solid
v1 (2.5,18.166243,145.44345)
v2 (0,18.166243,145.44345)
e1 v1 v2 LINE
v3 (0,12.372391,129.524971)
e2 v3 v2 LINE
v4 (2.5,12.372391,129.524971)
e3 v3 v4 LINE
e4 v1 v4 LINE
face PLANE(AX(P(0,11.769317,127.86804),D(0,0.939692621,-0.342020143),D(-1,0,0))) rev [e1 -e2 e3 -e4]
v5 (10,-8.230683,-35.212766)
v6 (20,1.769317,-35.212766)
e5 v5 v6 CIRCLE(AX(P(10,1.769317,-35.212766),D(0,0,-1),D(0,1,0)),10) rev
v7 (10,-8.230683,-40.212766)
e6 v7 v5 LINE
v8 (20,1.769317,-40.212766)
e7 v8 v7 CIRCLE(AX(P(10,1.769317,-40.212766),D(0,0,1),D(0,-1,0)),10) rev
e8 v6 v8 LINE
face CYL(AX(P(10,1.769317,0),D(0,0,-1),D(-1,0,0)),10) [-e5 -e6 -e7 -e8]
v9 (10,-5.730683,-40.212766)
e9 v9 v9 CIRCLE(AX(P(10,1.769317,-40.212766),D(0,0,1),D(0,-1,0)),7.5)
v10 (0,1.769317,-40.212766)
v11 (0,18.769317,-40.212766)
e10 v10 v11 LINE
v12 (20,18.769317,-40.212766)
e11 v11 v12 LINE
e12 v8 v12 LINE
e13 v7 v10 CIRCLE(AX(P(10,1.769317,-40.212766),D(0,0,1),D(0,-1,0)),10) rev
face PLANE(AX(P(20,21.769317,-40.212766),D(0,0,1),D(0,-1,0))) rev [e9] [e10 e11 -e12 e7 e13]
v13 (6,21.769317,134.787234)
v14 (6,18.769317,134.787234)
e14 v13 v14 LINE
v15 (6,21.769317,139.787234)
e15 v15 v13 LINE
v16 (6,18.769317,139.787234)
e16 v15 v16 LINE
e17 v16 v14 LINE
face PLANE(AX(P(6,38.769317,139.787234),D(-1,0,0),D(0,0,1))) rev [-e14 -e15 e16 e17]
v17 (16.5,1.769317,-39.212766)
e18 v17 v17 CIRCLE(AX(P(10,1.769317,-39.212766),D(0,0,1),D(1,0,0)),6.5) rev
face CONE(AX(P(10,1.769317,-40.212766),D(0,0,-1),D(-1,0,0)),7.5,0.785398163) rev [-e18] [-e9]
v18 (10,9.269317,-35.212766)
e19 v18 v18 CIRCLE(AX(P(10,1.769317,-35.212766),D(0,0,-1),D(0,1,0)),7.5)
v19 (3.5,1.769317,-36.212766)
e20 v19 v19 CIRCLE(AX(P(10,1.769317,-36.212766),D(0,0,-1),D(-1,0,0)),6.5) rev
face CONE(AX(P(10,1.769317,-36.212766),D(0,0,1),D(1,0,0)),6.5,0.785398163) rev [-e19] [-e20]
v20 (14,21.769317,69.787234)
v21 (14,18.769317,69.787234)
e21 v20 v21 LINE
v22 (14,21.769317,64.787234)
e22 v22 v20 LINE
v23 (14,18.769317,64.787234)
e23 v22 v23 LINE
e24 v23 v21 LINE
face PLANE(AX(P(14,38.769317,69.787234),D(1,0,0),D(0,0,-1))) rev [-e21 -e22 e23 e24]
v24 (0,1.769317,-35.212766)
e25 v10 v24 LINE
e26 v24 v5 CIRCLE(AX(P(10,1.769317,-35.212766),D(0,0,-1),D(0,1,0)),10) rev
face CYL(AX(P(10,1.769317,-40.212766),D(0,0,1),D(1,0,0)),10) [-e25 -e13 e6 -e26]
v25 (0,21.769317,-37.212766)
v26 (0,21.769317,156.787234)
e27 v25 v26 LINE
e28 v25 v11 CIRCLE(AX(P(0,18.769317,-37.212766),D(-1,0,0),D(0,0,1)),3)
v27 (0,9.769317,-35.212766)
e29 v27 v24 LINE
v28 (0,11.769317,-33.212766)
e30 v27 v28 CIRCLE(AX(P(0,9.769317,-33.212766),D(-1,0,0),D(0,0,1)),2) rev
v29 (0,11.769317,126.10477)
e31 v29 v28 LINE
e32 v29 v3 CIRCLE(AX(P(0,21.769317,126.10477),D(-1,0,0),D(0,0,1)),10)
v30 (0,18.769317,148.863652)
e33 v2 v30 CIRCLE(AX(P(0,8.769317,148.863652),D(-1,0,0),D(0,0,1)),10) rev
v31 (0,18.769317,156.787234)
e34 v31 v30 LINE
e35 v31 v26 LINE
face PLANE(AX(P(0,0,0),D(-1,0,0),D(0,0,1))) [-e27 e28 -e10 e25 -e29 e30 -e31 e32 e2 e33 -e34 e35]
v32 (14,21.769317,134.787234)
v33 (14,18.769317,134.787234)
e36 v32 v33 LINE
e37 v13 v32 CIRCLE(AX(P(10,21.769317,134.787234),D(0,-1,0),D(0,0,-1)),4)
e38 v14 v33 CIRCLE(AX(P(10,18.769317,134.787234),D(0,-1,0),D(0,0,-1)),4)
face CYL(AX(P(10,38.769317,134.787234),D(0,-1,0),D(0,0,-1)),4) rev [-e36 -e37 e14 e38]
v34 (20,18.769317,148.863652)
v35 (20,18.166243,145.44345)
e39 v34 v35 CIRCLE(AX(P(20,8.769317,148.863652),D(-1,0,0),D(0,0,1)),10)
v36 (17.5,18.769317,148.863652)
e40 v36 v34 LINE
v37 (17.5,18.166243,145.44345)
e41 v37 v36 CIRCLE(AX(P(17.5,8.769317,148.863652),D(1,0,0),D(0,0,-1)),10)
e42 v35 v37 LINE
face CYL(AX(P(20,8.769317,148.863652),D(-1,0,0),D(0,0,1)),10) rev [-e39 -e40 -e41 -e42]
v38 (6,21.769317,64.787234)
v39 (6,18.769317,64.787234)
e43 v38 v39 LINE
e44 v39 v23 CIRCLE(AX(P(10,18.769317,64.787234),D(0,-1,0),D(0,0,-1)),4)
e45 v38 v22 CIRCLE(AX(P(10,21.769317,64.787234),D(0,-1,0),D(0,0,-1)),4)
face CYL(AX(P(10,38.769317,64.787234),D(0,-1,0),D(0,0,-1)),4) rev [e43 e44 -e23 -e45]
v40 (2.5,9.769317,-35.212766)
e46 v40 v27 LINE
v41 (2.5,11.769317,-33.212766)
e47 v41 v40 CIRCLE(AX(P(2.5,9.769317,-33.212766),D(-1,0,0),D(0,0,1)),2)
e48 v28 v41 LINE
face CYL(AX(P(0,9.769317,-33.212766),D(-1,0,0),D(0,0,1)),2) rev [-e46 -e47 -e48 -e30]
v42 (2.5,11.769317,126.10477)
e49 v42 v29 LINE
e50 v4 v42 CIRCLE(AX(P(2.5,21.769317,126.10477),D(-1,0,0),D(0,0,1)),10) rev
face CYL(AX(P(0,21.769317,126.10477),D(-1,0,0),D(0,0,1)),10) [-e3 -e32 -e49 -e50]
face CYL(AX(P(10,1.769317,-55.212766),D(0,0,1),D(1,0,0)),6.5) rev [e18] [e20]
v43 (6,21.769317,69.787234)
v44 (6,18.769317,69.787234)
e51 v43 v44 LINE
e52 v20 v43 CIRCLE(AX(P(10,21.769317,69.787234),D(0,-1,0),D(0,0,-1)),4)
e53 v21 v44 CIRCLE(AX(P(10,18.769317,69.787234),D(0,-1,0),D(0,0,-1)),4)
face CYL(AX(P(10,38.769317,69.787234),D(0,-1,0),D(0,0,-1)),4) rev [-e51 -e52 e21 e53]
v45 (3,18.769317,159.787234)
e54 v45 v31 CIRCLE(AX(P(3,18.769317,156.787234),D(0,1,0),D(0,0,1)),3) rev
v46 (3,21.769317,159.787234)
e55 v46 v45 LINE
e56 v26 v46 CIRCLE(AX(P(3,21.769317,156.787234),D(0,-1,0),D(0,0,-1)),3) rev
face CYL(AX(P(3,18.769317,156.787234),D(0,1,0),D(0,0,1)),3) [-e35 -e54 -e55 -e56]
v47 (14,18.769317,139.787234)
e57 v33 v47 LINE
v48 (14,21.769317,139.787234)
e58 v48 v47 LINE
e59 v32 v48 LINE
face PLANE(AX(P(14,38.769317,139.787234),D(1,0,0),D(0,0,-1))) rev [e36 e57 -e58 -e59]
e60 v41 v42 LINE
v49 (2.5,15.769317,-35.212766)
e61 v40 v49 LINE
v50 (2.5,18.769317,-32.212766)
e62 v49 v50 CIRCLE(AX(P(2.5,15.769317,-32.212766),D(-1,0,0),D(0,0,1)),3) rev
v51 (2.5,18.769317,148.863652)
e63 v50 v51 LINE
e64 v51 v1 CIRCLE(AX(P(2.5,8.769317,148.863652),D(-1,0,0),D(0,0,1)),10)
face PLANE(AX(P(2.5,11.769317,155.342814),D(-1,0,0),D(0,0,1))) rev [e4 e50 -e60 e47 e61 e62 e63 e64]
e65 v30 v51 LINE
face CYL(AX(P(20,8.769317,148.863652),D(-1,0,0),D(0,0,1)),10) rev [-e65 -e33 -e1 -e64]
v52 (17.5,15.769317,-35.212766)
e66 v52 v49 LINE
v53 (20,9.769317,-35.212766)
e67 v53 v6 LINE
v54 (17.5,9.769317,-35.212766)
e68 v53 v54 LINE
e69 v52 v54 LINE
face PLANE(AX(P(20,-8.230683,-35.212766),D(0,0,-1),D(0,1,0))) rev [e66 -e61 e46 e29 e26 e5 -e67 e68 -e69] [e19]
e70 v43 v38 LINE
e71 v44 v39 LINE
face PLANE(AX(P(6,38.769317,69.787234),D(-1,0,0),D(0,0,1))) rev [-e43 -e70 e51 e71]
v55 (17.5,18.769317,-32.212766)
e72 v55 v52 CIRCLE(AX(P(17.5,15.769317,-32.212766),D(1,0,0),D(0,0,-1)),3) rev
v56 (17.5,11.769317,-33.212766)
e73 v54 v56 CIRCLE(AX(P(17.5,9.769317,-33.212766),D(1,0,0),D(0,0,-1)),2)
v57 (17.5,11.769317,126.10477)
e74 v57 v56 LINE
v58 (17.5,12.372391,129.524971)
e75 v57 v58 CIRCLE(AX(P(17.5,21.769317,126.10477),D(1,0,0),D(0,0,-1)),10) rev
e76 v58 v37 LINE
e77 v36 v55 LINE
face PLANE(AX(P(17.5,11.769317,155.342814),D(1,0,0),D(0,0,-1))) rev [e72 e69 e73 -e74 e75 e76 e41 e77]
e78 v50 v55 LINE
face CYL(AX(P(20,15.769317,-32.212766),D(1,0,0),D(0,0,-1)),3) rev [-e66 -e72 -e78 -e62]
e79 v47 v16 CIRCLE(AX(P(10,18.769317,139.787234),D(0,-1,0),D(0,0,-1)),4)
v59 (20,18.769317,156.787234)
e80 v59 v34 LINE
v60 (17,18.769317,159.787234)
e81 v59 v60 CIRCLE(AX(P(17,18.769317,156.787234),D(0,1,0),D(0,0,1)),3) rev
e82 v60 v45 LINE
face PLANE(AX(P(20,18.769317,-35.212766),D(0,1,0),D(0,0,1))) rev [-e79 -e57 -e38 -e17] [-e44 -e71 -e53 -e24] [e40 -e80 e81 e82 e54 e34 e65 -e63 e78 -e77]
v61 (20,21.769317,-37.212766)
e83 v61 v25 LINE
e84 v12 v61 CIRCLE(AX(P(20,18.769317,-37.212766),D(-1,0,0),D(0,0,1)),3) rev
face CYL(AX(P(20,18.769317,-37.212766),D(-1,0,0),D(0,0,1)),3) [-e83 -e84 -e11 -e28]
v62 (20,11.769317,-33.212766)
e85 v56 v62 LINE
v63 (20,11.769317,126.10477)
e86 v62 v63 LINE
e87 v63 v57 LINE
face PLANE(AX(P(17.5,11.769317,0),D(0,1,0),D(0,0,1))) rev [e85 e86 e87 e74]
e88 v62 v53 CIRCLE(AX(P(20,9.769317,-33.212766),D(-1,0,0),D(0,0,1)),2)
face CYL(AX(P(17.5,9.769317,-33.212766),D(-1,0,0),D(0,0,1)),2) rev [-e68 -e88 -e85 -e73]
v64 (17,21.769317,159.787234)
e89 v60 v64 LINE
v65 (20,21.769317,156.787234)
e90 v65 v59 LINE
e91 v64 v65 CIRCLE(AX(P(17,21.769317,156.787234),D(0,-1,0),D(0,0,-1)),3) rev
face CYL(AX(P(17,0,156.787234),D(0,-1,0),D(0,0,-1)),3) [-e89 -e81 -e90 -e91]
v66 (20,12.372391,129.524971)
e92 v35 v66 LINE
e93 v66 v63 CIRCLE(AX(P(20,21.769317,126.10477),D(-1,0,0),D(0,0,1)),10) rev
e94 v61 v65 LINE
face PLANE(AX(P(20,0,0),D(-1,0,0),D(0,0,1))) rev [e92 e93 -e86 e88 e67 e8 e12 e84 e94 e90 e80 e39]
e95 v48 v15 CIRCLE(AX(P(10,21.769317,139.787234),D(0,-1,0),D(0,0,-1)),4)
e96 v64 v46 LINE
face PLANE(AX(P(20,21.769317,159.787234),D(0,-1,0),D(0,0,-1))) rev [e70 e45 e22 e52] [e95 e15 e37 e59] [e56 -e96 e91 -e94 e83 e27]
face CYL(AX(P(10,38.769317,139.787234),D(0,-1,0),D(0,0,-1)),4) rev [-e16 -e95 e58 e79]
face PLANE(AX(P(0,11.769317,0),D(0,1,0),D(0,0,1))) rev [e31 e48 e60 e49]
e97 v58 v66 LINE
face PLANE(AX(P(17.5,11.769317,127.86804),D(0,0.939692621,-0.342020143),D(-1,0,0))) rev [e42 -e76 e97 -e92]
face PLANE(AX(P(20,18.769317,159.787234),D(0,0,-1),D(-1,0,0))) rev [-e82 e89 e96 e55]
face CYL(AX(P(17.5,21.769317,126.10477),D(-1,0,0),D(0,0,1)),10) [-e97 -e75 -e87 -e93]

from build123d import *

# Parameters (mm, degrees)
BOSS_EXTRUDE1_DEPTH = 20
CUT_EXTRUDE1_DEPTH  = 20
LPATTERN1_COUNT     = 2
LPATTERN1_PITCH     = 70
SKETCH3_R           = 6.5
CUT_EXTRUDE2_DEPTH  = 20
FILLET1_R           = 3
FILLET2_R           = 10
CHAMFER1_SIZE       = 1
FILLET3_R           = 3
SKETCH4_W           = 2.5
SKETCH4_H           = 193.282741961
BOSS_EXTRUDE2_DEPTH = 7
LPATTERN2_COUNT     = 2
LPATTERN2_PITCH     = 17.5
CHAMFER2_SIZE       = 27.474774195
CHAMFER2_SIZE_2     = 10
FILLET4_R           = 10
FILLET5_R           = 2


# Some blends are built 0.0001 mm under size
with BuildPart() as part:
    # Sketch1 → Boss-Extrude1 (new body)
    with BuildSketch(Plane(origin=(0, 0, 0), x_dir=(0, 0, -1), z_dir=(1, 0, 0))):
        Polygon((-159.787234043, 21.769316909), (40.212765957, 21.769316909), (40.212765957, -8.230683091), (35.212765957, -8.230683091), (35.212765957, 18.769316909), (-159.787234043, 18.769316909), align=None)
    extrude(amount=BOSS_EXTRUDE1_DEPTH)

    # Sketch2 → Cut-Extrude1 (cut)
    with BuildSketch(Plane.XZ.offset(-18.769316909)):
        with BuildLine():
            Line((14, 139.787234043), (14, 134.787234043))
            ThreePointArc((14, 134.787234043), (10, 130.787234043), (6, 134.787234043))
            Line((6, 134.787234043), (6, 139.787234043))
            ThreePointArc((6, 139.787234043), (10, 143.787234043), (14, 139.787234043))
        make_face()
    cut_extrude1 = extrude(amount=-CUT_EXTRUDE1_DEPTH, mode=Mode.SUBTRACT)

    # LPattern1: Cut-Extrude1 ×2
    with Locations(*[(0, 0, -i * LPATTERN1_PITCH) for i in range(1, LPATTERN1_COUNT)]):
        add(cut_extrude1, mode=Mode.SUBTRACT)

    # Sketch3 → Cut-Extrude2 (cut)
    with BuildSketch(Plane.XY.offset(-35.212765957)):
        with Locations((10, 1.769316909)):
            Circle(SKETCH3_R)
    extrude(amount=-CUT_EXTRUDE2_DEPTH, mode=Mode.SUBTRACT)

    # Fillet1
    fillet1_edges = [part.edges().sort_by_distance(p)[0] for p in [
        (10, 21.769316909, -40.212765957),
        (10, 18.769316909, -35.212765957),
    ]]
    fillet(fillet1_edges, radius=FILLET1_R)

    # Fillet2
    fillet2_edges = [part.edges().sort_by_distance(p)[0] for p in [
        (0, -8.230683091, -37.712765957),
        (20, -8.230683091, -37.712765957),
    ]]
    fillet(fillet2_edges, radius=FILLET2_R - 0.0001)  # a hair under: the kernel refuses the full size

    # Chamfer1
    chamfer1_edges = [part.edges().sort_by_distance(p)[0] for p in [
        (3.5, 1.769316909, -40.212765957),
        (3.5, 1.769316909, -35.212765957),
    ]]
    chamfer(chamfer1_edges, length=CHAMFER1_SIZE)

    # Fillet3
    fillet3_edges = [part.edges().sort_by_distance(p)[0] for p in [
        (20, 20.269316909, 159.787234043),
        (0, 20.269316909, 159.787234043),
    ]]
    fillet(fillet3_edges, radius=FILLET3_R)

    # Sketch4 → Boss-Extrude2 (add)
    with BuildSketch(Plane.XZ.offset(-18.769316909)):
        with Locations((1.25, 58.701442972)):
            Rectangle(SKETCH4_W, SKETCH4_H)
    boss_extrude2 = extrude(amount=BOSS_EXTRUDE2_DEPTH)

    # LPattern2: Boss-Extrude2 ×2
    with Locations(*[(i * LPATTERN2_PITCH, 0, 0) for i in range(1, LPATTERN2_COUNT)]):
        add(boss_extrude2)

    # Chamfer2
    # the kernel refuses this chamfer: 27.474774195, 10 mm, written as the material it takes off along each edge
    with BuildSketch(Plane(origin=(73.774914494, 11.769316909, 155.342813952), x_dir=(0, -0.013184058198645638, -0.9999130865277315), z_dir=(-1, 0, 0))) as chamfer2_piece_1_section:
        Polygon((CHAMFER2_SIZE * 0.999913086511, -CHAMFER2_SIZE * 0.0131840581984), (-CHAMFER2_SIZE_2 * 0.0131840581986, -CHAMFER2_SIZE_2 * 0.999913086528), (0, 0), align=None)
    chamfer2_piece_1 = extrude(amount=145.049828987, mode=Mode.PRIVATE)
    chamfer2_piece_1 = split(chamfer2_piece_1, bisect_by=Plane(origin=(1.25, 18.769316909, 145.126312786), z_dir=(0, -1, 0)), keep=Keep.TOP, mode=Mode.PRIVATE)
    add(chamfer2_piece_1, mode=Mode.SUBTRACT)
    with BuildSketch(Plane(origin=(91.274914494, 11.769316909, 155.342813952), x_dir=(0, -0.013184058198645638, -0.9999130865277315), z_dir=(-1, 0, 0))) as chamfer2_piece_2_section:
        Polygon((CHAMFER2_SIZE * 0.999913086511, -CHAMFER2_SIZE * 0.0131840581984), (-CHAMFER2_SIZE_2 * 0.0131840581986, -CHAMFER2_SIZE_2 * 0.999913086528), (0, 0), align=None)
    chamfer2_piece_2 = extrude(amount=145.049828987, mode=Mode.PRIVATE)
    chamfer2_piece_2 = split(chamfer2_piece_2, bisect_by=Plane(origin=(18.75, 18.769316909, 145.126312786), z_dir=(0, -1, 0)), keep=Keep.TOP, mode=Mode.PRIVATE)
    add(chamfer2_piece_2, mode=Mode.SUBTRACT)

    # Fillet4
    fillet4_edges = [part.edges().sort_by_distance(p)[0] for p in [
        (1.25, 11.769316909, 127.868039758),
        (18.75, 11.769316909, 127.868039758),
        (1.25, 18.769316909, 147.100381694),
        (18.75, 18.769316909, 147.100381694),
    ]]
    fillet(fillet4_edges, radius=FILLET4_R)

    # Fillet5
    fillet5_edges = [part.edges().sort_by_distance(p)[0] for p in [
        (1.25, 11.769316909, -35.212765957),
        (18.75, 11.769316909, -35.212765957),
    ]]
    fillet(fillet5_edges, radius=FILLET5_R)


solid = part.part
